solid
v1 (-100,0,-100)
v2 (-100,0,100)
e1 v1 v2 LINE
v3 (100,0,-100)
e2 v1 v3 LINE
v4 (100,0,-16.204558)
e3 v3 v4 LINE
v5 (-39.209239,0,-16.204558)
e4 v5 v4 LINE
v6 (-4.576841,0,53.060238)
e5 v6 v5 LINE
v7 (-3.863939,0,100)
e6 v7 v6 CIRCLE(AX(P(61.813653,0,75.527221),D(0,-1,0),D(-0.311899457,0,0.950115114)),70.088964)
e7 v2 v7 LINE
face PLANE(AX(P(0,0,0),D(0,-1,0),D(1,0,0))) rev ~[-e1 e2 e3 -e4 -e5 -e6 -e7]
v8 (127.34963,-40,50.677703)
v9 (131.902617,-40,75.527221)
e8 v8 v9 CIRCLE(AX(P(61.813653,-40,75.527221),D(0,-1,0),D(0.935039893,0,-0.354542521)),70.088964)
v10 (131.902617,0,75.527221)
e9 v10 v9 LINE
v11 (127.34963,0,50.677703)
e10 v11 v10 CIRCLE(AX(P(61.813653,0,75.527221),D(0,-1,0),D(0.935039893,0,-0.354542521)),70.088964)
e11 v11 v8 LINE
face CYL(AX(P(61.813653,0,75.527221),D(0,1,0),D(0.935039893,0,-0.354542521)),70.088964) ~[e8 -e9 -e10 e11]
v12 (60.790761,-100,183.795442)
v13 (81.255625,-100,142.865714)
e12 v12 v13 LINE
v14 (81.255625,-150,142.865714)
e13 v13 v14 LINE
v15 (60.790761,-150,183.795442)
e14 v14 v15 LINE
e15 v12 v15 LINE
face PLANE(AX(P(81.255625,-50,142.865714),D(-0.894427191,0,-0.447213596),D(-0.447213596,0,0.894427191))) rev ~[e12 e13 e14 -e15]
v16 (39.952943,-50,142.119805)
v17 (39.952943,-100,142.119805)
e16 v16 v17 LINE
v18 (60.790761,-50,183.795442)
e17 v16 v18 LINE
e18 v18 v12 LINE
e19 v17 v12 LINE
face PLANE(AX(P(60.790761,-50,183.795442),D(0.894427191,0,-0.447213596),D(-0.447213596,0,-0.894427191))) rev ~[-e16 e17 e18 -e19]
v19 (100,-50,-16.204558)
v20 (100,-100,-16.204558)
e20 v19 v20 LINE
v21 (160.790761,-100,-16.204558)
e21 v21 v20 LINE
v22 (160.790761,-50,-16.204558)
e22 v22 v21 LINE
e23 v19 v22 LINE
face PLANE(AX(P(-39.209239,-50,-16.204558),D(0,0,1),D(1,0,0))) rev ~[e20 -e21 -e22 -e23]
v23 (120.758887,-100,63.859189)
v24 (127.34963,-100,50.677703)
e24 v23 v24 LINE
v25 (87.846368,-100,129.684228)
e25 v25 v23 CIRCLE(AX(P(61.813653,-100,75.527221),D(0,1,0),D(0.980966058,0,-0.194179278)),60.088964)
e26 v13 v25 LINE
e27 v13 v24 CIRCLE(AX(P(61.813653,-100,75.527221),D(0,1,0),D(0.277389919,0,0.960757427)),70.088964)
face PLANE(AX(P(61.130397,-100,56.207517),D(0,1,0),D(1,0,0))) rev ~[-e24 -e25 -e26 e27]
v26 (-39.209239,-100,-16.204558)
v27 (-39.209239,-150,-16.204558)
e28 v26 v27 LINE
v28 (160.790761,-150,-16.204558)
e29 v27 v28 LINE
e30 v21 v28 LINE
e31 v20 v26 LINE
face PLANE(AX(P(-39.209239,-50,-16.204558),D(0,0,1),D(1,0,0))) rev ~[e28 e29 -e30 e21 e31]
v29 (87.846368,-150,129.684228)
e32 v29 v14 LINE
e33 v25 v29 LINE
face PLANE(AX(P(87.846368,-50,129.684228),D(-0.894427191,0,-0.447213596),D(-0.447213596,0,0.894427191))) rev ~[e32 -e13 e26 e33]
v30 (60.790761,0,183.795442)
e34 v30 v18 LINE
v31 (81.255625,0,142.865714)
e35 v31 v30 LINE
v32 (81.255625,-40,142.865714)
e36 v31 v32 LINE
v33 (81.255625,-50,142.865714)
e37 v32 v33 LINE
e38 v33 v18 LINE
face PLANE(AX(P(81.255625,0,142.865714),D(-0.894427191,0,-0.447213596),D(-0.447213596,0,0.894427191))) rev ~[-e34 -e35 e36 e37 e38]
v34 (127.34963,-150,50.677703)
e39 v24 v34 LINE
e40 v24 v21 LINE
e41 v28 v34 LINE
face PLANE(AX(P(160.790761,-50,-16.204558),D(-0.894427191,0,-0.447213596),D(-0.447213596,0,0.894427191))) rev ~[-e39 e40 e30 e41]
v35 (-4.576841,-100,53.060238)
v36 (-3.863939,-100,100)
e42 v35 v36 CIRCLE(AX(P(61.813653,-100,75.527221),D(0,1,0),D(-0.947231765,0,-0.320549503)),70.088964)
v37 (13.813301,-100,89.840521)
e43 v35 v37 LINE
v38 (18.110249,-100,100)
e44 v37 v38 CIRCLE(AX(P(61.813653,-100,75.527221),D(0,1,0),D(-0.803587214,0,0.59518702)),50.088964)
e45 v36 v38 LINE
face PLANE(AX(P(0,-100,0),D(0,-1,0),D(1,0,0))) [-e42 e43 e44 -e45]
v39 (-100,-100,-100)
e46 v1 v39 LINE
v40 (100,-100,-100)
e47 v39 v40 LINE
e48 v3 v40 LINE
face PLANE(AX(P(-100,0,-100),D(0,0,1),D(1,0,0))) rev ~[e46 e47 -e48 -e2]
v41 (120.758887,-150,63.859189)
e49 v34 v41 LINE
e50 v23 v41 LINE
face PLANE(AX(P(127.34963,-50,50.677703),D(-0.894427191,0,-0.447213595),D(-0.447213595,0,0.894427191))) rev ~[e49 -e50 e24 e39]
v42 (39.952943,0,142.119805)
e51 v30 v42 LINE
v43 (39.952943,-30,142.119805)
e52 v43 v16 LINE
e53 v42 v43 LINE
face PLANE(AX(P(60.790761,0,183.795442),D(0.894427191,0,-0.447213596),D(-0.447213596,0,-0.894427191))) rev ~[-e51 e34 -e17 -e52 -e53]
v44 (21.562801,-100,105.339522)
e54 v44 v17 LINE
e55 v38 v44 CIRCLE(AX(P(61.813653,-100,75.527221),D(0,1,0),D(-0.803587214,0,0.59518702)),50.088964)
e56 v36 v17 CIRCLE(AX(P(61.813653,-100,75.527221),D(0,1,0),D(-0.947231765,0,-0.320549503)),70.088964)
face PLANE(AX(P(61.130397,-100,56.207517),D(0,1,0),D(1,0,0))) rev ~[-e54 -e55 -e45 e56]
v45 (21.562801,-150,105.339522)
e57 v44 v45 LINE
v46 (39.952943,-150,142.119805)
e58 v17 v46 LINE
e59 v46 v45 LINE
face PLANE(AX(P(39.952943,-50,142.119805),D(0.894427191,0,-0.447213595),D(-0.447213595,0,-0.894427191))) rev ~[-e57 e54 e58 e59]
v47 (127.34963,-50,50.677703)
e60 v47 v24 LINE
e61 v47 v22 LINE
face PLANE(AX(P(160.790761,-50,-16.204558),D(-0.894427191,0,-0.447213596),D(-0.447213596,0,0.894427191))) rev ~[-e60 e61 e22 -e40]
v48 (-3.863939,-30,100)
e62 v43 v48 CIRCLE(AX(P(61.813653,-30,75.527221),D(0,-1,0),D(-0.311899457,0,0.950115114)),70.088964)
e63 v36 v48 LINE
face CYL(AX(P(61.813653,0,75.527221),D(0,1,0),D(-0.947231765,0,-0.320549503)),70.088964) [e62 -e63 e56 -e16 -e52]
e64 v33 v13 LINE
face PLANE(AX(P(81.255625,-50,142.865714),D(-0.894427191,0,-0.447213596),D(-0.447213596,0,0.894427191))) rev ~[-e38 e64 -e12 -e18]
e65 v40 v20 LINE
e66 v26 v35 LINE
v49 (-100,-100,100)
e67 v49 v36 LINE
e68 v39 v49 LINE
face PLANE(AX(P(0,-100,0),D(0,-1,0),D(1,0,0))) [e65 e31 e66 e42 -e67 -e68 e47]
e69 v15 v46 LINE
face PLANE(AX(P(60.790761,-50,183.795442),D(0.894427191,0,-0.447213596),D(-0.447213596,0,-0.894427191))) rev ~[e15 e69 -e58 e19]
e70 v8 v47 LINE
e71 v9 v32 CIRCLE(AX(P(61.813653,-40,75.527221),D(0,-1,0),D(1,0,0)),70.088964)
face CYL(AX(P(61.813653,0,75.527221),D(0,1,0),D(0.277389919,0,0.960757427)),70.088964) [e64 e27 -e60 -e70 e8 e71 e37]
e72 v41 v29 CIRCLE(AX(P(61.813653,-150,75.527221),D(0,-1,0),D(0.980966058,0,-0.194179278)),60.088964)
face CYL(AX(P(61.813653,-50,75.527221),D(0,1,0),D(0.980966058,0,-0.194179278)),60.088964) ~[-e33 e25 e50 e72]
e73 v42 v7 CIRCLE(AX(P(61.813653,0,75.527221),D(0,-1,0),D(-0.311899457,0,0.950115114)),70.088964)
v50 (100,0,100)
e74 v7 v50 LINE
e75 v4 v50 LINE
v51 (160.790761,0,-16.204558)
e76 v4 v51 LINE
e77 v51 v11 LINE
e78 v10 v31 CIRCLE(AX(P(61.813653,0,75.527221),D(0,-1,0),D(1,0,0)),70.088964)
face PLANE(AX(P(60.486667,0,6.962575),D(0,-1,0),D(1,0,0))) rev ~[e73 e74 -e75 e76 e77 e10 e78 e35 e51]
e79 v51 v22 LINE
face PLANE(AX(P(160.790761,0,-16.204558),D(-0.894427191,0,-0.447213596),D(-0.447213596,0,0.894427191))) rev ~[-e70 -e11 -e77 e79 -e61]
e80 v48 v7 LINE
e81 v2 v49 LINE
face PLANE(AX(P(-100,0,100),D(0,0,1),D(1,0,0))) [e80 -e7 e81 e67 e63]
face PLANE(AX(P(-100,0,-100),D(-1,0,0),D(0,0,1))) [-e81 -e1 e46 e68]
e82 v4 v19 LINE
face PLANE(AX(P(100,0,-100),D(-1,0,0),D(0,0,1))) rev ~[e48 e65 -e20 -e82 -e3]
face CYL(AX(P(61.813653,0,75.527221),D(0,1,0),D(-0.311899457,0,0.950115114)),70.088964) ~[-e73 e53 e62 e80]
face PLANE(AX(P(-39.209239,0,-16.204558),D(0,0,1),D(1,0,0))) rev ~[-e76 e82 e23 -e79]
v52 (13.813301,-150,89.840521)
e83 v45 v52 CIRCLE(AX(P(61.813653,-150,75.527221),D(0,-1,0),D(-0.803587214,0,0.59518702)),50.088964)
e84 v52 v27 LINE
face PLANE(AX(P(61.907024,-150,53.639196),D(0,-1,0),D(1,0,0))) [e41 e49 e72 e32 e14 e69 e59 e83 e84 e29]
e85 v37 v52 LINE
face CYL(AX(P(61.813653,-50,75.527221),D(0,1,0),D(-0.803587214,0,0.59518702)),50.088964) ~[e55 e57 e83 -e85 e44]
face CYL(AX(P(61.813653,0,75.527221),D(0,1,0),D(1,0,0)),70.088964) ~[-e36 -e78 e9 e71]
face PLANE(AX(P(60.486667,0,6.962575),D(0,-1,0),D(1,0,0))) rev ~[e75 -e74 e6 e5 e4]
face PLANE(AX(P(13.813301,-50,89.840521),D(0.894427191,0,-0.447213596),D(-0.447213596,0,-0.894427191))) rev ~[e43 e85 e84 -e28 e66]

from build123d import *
from build123d import SkipClean  # not in build123d's __all__

# Parameters (mm, degrees)
F1_DEPTH = 50
F2_R     = 10
F3_R     = 20
F4_W     = 200
F4_H     = 200
F5_DEPTH = 100


with BuildPart() as f1:
    # F0 (on Front) → F1 (new body)
    with BuildSketch(Plane.XZ):
        with BuildLine():
            Line((-4.5768408876, 53.0602382816), (-39.2092391849, -16.2045583129))
            Line((-39.2092391849, -16.2045583129), (160.7907608151, -16.2045583129))
            Line((160.7907608151, -16.2045583129), (127.34963023, 50.6777028574))
            ThreePointArc((127.34963023, 50.6777028574), (60.5480822774, 5.4496834996), (-4.5768408876, 53.0602382816))
        make_face()
        with BuildLine():
            ThreePointArc((39.9529426198, 142.1198052965), (-0.8758229979, 106.8719587211), (-4.5768408876, 53.0602382816))
            Line((-4.5768408876, 53.0602382816), (39.9529426198, 142.1198052965))
        make_face()
        with BuildLine():
            Line((39.9529426198, 142.1198052965), (-4.5768408876, 53.0602382816))
            ThreePointArc((-4.5768408876, 53.0602382816), (60.5480822774, 5.4496834996), (127.34963023, 50.6777028574))
            Line((127.34963023, 50.6777028574), (81.2556246585, 142.8657140004))
            ThreePointArc((81.2556246585, 142.8657140004), (60.5480822774, 145.6047584293), (39.9529426198, 142.1198052965))
        make_face()
        with BuildLine():
            Line((81.2556246585, 142.8657140004), (127.34963023, 50.6777028574))
            ThreePointArc((127.34963023, 50.6777028574), (130.7549744187, 62.8956312233), (131.9026168762, 75.5272209644))
            ThreePointArc((131.9026168762, 75.5272209644), (117.8276267442, 117.6567547414), (81.2556246585, 142.8657140004))
        make_face()
        with BuildLine():
            Line((60.7907608151, 183.7954416871), (39.9529426198, 142.1198052965))
            ThreePointArc((39.9529426198, 142.1198052965), (60.5480822774, 145.6047584293), (81.2556246585, 142.8657140004))
            Line((81.2556246585, 142.8657140004), (60.7907608151, 183.7954416871))
        make_face()
    extrude(amount=F1_DEPTH)

    # F2
    f2_edges = [f1.edges().sort_by_distance(p)[0] for p in [
        (124.503128, -50, 106.871959),
    ]]
    fillet(f2_edges, radius=F2_R)

    # F3
    f3_edges = [f1.edges().sort_by_distance(p)[0] for p in [
        (-0.875823, -50, 106.871959),
    ]]
    fillet(f3_edges, radius=F3_R)

    # F4 (on Front) + F1_face (on face) + F1_face1 (on face) → F5 (join)
    with BuildSketch(Plane.XZ):
        Rectangle(F4_W, F4_H)
    with BuildSketch(Plane(origin=(62.2431161931, -50, 51.9688897251), x_dir=(1, 0, 0), z_dir=(0, -1, 0))):
        with BuildLine():
            Line((-22.2901735733, 90.1509155714), (-40.6803150229, 53.3706326721))
            ThreePointArc((-40.6803150229, 53.3706326721), (-45.230395371, 45.958797086), (-48.429815631, 37.8716314558))
            Line((-48.429815631, 37.8716314558), (-66.8199570807, 1.0913485565))
            Line((-66.8199570807, 1.0913485565), (-101.452355378, -68.173448038))
            Line((-101.452355378, -68.173448038), (98.547644622, -68.173448038))
            Line((98.547644622, -68.173448038), (65.1065140369, -1.2911868678))
            Line((65.1065140369, -1.2911868678), (58.5157708494, 11.8902995073))
            ThreePointArc((58.5157708494, 11.8902995073), (53.3157399256, 50.430933041), (25.603251653, 77.7153379001))
            Line((25.603251653, 77.7153379001), (19.0125084654, 90.8968242752))
            Line((19.0125084654, 90.8968242752), (-1.452355378, 131.826551962))
            Line((-1.452355378, 131.826551962), (-22.2901735733, 90.1509155714))
        make_face()
    with BuildSketch(Plane(origin=(61.2741122872, 0, 57.1327908737), x_dir=(1, 0, 0), z_dir=(0, 1, 0))):
        with BuildLine():
            Line((-100.4833514721, 73.3373491866), (-65.8509531748, 4.072552592))
            ThreePointArc((-65.8509531748, 4.072552592), (-62.1499352851, -49.7391678474), (-21.3211696674, -84.9870144228))
            Line((-21.3211696674, -84.9870144228), (-0.4833514721, -126.6626508134))
            Line((-0.4833514721, -126.6626508134), (19.9815123713, -85.7329231267))
            ThreePointArc((19.9815123713, -85.7329231267), (63.2290157415, -49.7391678474), (66.0755179428, 6.4550880163))
            Line((66.0755179428, 6.4550880163), (99.5166485279, 73.3373491866))
            Line((99.5166485279, 73.3373491866), (-100.4833514721, 73.3373491866))
        make_face()
    with SkipClean():  # cleaning this boolean's faces spoils the solid; the shape is the same uncleaned
        extrude(amount=F5_DEPTH, dir=(0, -1, 0))


solid = f1.part
